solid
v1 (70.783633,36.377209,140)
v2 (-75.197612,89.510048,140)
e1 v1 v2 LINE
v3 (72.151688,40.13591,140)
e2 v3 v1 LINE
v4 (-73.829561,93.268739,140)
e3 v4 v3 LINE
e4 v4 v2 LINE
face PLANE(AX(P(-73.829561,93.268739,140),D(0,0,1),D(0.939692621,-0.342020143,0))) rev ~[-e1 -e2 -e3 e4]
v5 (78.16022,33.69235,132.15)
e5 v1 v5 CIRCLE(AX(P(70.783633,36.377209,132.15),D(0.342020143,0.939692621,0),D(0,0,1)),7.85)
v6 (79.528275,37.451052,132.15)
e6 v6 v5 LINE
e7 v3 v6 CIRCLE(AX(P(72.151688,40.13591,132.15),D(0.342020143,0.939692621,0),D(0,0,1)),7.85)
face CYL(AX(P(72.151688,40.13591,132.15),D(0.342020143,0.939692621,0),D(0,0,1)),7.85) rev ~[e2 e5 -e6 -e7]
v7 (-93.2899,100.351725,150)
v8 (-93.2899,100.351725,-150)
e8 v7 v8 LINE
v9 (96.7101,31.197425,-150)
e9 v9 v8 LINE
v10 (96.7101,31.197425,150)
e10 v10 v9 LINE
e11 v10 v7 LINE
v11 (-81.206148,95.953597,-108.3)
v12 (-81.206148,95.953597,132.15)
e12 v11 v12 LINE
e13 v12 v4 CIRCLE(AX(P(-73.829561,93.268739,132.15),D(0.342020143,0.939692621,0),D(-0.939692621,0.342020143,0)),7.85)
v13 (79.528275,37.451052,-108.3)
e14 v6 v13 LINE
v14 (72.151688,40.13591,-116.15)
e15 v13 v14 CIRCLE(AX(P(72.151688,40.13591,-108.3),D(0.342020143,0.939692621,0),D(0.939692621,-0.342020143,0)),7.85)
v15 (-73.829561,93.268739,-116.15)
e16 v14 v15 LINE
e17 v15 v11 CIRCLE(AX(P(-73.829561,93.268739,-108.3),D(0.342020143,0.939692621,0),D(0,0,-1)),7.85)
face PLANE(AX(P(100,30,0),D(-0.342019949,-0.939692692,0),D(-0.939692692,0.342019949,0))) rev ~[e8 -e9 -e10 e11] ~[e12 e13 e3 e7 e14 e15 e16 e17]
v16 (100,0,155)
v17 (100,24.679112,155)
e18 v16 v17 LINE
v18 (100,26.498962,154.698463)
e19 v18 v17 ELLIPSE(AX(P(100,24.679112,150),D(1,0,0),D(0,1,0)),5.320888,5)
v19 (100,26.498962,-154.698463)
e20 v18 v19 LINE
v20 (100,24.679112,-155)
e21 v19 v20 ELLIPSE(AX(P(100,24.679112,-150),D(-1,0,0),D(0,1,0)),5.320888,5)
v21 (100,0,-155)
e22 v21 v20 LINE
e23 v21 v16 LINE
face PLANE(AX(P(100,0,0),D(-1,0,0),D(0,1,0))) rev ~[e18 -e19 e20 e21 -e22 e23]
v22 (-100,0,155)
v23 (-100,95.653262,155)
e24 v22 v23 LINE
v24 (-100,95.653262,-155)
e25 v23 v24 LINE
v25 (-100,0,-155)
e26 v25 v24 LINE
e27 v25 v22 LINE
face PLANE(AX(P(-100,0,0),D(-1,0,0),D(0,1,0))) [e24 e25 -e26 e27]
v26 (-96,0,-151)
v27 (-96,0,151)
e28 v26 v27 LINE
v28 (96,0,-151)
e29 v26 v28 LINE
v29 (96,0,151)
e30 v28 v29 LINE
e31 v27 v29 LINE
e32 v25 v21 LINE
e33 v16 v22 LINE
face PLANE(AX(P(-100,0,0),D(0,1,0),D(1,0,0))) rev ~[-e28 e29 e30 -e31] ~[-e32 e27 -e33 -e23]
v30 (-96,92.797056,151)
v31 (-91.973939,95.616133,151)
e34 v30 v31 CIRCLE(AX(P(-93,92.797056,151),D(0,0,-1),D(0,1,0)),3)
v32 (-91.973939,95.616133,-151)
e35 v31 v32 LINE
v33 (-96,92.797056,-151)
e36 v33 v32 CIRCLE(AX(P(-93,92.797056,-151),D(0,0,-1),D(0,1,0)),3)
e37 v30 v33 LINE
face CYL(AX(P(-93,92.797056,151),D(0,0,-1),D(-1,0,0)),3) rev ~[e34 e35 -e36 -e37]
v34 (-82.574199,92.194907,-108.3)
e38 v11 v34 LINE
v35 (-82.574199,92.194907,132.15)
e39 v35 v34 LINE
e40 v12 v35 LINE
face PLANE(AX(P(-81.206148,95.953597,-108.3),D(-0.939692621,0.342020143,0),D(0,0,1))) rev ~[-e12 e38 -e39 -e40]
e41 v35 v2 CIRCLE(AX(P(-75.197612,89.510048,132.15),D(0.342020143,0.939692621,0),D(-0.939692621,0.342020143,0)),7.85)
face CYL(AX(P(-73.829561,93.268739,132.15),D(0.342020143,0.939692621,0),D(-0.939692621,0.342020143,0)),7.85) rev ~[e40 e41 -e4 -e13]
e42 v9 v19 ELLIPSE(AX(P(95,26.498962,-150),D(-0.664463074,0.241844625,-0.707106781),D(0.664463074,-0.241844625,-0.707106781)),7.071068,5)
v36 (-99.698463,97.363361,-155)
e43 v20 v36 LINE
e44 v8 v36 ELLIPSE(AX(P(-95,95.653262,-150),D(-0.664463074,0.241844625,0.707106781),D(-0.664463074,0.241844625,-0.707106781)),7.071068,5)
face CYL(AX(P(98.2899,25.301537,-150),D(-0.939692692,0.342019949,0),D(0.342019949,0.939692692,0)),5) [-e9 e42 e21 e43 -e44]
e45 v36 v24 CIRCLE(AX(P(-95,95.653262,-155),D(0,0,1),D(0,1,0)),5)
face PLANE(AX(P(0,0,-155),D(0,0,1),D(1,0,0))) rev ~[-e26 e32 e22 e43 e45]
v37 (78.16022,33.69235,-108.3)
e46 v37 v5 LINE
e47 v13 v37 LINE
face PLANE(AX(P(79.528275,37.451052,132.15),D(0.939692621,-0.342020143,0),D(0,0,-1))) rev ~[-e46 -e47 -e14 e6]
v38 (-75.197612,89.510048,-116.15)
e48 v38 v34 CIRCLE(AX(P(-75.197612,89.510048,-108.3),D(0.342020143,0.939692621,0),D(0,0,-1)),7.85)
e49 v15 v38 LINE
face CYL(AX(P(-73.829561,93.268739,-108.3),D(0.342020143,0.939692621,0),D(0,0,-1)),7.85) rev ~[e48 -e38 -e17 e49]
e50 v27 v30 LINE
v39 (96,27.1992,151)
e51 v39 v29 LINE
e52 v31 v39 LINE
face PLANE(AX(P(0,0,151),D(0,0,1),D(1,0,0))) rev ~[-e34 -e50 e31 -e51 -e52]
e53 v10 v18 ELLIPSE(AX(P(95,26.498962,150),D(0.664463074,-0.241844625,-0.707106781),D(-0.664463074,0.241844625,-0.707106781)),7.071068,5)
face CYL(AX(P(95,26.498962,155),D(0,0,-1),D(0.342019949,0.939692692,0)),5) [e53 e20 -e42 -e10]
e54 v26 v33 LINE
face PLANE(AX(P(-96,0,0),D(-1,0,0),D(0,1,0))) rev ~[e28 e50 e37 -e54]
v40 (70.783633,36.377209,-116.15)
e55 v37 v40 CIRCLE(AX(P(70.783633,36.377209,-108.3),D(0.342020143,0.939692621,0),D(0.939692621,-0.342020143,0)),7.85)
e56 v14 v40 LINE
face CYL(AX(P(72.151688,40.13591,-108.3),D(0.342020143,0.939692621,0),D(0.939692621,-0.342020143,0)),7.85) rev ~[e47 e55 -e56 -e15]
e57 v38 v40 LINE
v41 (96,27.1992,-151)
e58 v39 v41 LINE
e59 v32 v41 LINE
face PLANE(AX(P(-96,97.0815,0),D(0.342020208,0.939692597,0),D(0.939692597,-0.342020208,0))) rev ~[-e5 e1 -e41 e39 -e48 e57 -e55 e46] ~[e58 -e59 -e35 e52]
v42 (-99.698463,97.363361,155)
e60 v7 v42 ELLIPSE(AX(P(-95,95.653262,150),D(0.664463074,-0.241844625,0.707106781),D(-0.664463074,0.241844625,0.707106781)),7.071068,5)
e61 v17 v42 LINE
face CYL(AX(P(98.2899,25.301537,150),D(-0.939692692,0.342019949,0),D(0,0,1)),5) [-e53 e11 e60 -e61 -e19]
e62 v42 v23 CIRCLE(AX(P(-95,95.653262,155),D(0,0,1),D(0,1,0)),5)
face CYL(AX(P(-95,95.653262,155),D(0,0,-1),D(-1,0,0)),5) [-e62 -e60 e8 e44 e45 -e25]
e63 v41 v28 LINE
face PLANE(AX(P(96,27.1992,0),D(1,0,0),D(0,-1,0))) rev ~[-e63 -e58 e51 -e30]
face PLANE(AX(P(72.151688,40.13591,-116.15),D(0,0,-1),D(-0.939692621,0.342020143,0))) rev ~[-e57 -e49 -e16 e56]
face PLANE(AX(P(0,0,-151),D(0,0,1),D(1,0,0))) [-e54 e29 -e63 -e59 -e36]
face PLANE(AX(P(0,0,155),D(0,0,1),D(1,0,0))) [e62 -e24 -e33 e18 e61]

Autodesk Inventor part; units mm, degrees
ref_plane "YZ Plane" through (0, 0, 0) normal (1, 0, 0) x (0, 1, 0)
sketch "Sketch1" plane through (0, 0, 0) normal (0, 1, 0) x (-1, 0, 0)
  line L0 (100, 155) -> (-100, 155)
  line L1 (-100, 155) -> (-100, -155)
  line L2 (-100, -155) -> (100, -155)
  line L3 (100, -155) -> (100, 155)
  point P0 (0, 0)
  point P1 (100, 0)
  point P2 (0, -155)
  dimension "d0" = 310
  dimension "d1" = 200
sketch "Sketch2" plane through (0, 0, 0) normal (0, 0, 1) x (1, 0, 0)
  line L0 (-100, 0) -> (100, 0)
  line L1 (100, 0) -> (100, 30)
  line L2 (100, 30) -> (-100, 102.794)
  line L3 (-100, 0) -> (-100, 102.794)
  line L4 (-96, 97.0815) -> (96, 27.1992)
  line L5 (96, 27.1992) -> (96, 0)
  line L6 (-96, 0) -> (-96, 97.0815)
  point P0 (0, 0)
  point P1 (0, 0)
  dimension "d2" = 200
  dimension "d3" = 30
  dimension "d4" = 110
  dimension "d5" = 4
  dimension "d6" = 110
  dimension "d7" = 4
  dimension "d8" = 27.1992
extrude "Extrusion1" add sketch "Sketch2" along normal mid plane 310
extrude "Extrusion2" cut sketch "Sketch2" along normal mid plane 302 contours L6 L4 L5 L0
sketch "Sketch3" plane through (-100, 102.794, 155) normal (0.3420201, 0.9396926, 0) x (0.9396926, -0.3420201, 0)
  line L0 (27.85, 15) -> (183.2, 15)
  line L1 (191.05, 22.85) -> (191.05, 263.3)
  line L2 (183.2, 271.15) -> (27.85, 271.15)
  line L3 (20, 263.3) -> (20, 22.85)
  line L4 (0, 310) -> (0, 0) projected
  line L5 (212.8356, 0) -> (0, 0) projected
  arc A0 (20, 22.85) -> (27.85, 15) centre (27.85, 22.85) ccw
  arc A1 (27.85, 271.15) -> (20, 263.3) centre (27.85, 263.3) ccw
  arc A2 (191.05, 263.3) -> (183.2, 271.15) centre (183.2, 263.3) ccw
  arc A3 (183.2, 15) -> (191.05, 22.85) centre (183.2, 22.85) ccw
  point P0 (129.1269, 155)
  point P1 (191.05, 271.15)
  point P2 (191.05, 15)
  point P3 (20, 271.15)
  dimension "d13" = 171.05
  dimension "d14" = 256.15
  dimension "d15" = 20
  dimension "d16" = 15
  dimension "d17" = 7.85
  dimension "d18" = 7.85
extrude "Extrusion3" cut sketch "Sketch3" against normal up to next
fillet "Fillet1" radius 5 4 edges at (0, 66.397, 155) (0, 66.397, -155) (-100, 102.794, 0) (100, 30, 0)
ref_plane "Work Plane1" through (-10.2594, 70.1311, 132.15) normal (0.9396926, -0.3420201, 0) x (0, 0, -1)
sketch "Sketch4" plane through (-10.2594, 70.1311, 132.15) normal (0.9396926, -0.3420201, 0) x (0, 0, -1)
  point P0 (132.15, -62.3928)
ref_plane "Work Plane2" through (72.1517, 40.136, 4) normal (0, 0, -1) x (-0.9396926, 0.3420201, 0)
sketch "Sketch5" plane through (72.1517, 40.136, 4) normal (0, 0, -1) x (-0.9396926, 0.3420201, 0)
  point P0 (54.0731, -62.3928)
fillet "Fillet2" radius 3 1 edges at (-96, 97.0815, 0)
properties part number "Screen_Support"
